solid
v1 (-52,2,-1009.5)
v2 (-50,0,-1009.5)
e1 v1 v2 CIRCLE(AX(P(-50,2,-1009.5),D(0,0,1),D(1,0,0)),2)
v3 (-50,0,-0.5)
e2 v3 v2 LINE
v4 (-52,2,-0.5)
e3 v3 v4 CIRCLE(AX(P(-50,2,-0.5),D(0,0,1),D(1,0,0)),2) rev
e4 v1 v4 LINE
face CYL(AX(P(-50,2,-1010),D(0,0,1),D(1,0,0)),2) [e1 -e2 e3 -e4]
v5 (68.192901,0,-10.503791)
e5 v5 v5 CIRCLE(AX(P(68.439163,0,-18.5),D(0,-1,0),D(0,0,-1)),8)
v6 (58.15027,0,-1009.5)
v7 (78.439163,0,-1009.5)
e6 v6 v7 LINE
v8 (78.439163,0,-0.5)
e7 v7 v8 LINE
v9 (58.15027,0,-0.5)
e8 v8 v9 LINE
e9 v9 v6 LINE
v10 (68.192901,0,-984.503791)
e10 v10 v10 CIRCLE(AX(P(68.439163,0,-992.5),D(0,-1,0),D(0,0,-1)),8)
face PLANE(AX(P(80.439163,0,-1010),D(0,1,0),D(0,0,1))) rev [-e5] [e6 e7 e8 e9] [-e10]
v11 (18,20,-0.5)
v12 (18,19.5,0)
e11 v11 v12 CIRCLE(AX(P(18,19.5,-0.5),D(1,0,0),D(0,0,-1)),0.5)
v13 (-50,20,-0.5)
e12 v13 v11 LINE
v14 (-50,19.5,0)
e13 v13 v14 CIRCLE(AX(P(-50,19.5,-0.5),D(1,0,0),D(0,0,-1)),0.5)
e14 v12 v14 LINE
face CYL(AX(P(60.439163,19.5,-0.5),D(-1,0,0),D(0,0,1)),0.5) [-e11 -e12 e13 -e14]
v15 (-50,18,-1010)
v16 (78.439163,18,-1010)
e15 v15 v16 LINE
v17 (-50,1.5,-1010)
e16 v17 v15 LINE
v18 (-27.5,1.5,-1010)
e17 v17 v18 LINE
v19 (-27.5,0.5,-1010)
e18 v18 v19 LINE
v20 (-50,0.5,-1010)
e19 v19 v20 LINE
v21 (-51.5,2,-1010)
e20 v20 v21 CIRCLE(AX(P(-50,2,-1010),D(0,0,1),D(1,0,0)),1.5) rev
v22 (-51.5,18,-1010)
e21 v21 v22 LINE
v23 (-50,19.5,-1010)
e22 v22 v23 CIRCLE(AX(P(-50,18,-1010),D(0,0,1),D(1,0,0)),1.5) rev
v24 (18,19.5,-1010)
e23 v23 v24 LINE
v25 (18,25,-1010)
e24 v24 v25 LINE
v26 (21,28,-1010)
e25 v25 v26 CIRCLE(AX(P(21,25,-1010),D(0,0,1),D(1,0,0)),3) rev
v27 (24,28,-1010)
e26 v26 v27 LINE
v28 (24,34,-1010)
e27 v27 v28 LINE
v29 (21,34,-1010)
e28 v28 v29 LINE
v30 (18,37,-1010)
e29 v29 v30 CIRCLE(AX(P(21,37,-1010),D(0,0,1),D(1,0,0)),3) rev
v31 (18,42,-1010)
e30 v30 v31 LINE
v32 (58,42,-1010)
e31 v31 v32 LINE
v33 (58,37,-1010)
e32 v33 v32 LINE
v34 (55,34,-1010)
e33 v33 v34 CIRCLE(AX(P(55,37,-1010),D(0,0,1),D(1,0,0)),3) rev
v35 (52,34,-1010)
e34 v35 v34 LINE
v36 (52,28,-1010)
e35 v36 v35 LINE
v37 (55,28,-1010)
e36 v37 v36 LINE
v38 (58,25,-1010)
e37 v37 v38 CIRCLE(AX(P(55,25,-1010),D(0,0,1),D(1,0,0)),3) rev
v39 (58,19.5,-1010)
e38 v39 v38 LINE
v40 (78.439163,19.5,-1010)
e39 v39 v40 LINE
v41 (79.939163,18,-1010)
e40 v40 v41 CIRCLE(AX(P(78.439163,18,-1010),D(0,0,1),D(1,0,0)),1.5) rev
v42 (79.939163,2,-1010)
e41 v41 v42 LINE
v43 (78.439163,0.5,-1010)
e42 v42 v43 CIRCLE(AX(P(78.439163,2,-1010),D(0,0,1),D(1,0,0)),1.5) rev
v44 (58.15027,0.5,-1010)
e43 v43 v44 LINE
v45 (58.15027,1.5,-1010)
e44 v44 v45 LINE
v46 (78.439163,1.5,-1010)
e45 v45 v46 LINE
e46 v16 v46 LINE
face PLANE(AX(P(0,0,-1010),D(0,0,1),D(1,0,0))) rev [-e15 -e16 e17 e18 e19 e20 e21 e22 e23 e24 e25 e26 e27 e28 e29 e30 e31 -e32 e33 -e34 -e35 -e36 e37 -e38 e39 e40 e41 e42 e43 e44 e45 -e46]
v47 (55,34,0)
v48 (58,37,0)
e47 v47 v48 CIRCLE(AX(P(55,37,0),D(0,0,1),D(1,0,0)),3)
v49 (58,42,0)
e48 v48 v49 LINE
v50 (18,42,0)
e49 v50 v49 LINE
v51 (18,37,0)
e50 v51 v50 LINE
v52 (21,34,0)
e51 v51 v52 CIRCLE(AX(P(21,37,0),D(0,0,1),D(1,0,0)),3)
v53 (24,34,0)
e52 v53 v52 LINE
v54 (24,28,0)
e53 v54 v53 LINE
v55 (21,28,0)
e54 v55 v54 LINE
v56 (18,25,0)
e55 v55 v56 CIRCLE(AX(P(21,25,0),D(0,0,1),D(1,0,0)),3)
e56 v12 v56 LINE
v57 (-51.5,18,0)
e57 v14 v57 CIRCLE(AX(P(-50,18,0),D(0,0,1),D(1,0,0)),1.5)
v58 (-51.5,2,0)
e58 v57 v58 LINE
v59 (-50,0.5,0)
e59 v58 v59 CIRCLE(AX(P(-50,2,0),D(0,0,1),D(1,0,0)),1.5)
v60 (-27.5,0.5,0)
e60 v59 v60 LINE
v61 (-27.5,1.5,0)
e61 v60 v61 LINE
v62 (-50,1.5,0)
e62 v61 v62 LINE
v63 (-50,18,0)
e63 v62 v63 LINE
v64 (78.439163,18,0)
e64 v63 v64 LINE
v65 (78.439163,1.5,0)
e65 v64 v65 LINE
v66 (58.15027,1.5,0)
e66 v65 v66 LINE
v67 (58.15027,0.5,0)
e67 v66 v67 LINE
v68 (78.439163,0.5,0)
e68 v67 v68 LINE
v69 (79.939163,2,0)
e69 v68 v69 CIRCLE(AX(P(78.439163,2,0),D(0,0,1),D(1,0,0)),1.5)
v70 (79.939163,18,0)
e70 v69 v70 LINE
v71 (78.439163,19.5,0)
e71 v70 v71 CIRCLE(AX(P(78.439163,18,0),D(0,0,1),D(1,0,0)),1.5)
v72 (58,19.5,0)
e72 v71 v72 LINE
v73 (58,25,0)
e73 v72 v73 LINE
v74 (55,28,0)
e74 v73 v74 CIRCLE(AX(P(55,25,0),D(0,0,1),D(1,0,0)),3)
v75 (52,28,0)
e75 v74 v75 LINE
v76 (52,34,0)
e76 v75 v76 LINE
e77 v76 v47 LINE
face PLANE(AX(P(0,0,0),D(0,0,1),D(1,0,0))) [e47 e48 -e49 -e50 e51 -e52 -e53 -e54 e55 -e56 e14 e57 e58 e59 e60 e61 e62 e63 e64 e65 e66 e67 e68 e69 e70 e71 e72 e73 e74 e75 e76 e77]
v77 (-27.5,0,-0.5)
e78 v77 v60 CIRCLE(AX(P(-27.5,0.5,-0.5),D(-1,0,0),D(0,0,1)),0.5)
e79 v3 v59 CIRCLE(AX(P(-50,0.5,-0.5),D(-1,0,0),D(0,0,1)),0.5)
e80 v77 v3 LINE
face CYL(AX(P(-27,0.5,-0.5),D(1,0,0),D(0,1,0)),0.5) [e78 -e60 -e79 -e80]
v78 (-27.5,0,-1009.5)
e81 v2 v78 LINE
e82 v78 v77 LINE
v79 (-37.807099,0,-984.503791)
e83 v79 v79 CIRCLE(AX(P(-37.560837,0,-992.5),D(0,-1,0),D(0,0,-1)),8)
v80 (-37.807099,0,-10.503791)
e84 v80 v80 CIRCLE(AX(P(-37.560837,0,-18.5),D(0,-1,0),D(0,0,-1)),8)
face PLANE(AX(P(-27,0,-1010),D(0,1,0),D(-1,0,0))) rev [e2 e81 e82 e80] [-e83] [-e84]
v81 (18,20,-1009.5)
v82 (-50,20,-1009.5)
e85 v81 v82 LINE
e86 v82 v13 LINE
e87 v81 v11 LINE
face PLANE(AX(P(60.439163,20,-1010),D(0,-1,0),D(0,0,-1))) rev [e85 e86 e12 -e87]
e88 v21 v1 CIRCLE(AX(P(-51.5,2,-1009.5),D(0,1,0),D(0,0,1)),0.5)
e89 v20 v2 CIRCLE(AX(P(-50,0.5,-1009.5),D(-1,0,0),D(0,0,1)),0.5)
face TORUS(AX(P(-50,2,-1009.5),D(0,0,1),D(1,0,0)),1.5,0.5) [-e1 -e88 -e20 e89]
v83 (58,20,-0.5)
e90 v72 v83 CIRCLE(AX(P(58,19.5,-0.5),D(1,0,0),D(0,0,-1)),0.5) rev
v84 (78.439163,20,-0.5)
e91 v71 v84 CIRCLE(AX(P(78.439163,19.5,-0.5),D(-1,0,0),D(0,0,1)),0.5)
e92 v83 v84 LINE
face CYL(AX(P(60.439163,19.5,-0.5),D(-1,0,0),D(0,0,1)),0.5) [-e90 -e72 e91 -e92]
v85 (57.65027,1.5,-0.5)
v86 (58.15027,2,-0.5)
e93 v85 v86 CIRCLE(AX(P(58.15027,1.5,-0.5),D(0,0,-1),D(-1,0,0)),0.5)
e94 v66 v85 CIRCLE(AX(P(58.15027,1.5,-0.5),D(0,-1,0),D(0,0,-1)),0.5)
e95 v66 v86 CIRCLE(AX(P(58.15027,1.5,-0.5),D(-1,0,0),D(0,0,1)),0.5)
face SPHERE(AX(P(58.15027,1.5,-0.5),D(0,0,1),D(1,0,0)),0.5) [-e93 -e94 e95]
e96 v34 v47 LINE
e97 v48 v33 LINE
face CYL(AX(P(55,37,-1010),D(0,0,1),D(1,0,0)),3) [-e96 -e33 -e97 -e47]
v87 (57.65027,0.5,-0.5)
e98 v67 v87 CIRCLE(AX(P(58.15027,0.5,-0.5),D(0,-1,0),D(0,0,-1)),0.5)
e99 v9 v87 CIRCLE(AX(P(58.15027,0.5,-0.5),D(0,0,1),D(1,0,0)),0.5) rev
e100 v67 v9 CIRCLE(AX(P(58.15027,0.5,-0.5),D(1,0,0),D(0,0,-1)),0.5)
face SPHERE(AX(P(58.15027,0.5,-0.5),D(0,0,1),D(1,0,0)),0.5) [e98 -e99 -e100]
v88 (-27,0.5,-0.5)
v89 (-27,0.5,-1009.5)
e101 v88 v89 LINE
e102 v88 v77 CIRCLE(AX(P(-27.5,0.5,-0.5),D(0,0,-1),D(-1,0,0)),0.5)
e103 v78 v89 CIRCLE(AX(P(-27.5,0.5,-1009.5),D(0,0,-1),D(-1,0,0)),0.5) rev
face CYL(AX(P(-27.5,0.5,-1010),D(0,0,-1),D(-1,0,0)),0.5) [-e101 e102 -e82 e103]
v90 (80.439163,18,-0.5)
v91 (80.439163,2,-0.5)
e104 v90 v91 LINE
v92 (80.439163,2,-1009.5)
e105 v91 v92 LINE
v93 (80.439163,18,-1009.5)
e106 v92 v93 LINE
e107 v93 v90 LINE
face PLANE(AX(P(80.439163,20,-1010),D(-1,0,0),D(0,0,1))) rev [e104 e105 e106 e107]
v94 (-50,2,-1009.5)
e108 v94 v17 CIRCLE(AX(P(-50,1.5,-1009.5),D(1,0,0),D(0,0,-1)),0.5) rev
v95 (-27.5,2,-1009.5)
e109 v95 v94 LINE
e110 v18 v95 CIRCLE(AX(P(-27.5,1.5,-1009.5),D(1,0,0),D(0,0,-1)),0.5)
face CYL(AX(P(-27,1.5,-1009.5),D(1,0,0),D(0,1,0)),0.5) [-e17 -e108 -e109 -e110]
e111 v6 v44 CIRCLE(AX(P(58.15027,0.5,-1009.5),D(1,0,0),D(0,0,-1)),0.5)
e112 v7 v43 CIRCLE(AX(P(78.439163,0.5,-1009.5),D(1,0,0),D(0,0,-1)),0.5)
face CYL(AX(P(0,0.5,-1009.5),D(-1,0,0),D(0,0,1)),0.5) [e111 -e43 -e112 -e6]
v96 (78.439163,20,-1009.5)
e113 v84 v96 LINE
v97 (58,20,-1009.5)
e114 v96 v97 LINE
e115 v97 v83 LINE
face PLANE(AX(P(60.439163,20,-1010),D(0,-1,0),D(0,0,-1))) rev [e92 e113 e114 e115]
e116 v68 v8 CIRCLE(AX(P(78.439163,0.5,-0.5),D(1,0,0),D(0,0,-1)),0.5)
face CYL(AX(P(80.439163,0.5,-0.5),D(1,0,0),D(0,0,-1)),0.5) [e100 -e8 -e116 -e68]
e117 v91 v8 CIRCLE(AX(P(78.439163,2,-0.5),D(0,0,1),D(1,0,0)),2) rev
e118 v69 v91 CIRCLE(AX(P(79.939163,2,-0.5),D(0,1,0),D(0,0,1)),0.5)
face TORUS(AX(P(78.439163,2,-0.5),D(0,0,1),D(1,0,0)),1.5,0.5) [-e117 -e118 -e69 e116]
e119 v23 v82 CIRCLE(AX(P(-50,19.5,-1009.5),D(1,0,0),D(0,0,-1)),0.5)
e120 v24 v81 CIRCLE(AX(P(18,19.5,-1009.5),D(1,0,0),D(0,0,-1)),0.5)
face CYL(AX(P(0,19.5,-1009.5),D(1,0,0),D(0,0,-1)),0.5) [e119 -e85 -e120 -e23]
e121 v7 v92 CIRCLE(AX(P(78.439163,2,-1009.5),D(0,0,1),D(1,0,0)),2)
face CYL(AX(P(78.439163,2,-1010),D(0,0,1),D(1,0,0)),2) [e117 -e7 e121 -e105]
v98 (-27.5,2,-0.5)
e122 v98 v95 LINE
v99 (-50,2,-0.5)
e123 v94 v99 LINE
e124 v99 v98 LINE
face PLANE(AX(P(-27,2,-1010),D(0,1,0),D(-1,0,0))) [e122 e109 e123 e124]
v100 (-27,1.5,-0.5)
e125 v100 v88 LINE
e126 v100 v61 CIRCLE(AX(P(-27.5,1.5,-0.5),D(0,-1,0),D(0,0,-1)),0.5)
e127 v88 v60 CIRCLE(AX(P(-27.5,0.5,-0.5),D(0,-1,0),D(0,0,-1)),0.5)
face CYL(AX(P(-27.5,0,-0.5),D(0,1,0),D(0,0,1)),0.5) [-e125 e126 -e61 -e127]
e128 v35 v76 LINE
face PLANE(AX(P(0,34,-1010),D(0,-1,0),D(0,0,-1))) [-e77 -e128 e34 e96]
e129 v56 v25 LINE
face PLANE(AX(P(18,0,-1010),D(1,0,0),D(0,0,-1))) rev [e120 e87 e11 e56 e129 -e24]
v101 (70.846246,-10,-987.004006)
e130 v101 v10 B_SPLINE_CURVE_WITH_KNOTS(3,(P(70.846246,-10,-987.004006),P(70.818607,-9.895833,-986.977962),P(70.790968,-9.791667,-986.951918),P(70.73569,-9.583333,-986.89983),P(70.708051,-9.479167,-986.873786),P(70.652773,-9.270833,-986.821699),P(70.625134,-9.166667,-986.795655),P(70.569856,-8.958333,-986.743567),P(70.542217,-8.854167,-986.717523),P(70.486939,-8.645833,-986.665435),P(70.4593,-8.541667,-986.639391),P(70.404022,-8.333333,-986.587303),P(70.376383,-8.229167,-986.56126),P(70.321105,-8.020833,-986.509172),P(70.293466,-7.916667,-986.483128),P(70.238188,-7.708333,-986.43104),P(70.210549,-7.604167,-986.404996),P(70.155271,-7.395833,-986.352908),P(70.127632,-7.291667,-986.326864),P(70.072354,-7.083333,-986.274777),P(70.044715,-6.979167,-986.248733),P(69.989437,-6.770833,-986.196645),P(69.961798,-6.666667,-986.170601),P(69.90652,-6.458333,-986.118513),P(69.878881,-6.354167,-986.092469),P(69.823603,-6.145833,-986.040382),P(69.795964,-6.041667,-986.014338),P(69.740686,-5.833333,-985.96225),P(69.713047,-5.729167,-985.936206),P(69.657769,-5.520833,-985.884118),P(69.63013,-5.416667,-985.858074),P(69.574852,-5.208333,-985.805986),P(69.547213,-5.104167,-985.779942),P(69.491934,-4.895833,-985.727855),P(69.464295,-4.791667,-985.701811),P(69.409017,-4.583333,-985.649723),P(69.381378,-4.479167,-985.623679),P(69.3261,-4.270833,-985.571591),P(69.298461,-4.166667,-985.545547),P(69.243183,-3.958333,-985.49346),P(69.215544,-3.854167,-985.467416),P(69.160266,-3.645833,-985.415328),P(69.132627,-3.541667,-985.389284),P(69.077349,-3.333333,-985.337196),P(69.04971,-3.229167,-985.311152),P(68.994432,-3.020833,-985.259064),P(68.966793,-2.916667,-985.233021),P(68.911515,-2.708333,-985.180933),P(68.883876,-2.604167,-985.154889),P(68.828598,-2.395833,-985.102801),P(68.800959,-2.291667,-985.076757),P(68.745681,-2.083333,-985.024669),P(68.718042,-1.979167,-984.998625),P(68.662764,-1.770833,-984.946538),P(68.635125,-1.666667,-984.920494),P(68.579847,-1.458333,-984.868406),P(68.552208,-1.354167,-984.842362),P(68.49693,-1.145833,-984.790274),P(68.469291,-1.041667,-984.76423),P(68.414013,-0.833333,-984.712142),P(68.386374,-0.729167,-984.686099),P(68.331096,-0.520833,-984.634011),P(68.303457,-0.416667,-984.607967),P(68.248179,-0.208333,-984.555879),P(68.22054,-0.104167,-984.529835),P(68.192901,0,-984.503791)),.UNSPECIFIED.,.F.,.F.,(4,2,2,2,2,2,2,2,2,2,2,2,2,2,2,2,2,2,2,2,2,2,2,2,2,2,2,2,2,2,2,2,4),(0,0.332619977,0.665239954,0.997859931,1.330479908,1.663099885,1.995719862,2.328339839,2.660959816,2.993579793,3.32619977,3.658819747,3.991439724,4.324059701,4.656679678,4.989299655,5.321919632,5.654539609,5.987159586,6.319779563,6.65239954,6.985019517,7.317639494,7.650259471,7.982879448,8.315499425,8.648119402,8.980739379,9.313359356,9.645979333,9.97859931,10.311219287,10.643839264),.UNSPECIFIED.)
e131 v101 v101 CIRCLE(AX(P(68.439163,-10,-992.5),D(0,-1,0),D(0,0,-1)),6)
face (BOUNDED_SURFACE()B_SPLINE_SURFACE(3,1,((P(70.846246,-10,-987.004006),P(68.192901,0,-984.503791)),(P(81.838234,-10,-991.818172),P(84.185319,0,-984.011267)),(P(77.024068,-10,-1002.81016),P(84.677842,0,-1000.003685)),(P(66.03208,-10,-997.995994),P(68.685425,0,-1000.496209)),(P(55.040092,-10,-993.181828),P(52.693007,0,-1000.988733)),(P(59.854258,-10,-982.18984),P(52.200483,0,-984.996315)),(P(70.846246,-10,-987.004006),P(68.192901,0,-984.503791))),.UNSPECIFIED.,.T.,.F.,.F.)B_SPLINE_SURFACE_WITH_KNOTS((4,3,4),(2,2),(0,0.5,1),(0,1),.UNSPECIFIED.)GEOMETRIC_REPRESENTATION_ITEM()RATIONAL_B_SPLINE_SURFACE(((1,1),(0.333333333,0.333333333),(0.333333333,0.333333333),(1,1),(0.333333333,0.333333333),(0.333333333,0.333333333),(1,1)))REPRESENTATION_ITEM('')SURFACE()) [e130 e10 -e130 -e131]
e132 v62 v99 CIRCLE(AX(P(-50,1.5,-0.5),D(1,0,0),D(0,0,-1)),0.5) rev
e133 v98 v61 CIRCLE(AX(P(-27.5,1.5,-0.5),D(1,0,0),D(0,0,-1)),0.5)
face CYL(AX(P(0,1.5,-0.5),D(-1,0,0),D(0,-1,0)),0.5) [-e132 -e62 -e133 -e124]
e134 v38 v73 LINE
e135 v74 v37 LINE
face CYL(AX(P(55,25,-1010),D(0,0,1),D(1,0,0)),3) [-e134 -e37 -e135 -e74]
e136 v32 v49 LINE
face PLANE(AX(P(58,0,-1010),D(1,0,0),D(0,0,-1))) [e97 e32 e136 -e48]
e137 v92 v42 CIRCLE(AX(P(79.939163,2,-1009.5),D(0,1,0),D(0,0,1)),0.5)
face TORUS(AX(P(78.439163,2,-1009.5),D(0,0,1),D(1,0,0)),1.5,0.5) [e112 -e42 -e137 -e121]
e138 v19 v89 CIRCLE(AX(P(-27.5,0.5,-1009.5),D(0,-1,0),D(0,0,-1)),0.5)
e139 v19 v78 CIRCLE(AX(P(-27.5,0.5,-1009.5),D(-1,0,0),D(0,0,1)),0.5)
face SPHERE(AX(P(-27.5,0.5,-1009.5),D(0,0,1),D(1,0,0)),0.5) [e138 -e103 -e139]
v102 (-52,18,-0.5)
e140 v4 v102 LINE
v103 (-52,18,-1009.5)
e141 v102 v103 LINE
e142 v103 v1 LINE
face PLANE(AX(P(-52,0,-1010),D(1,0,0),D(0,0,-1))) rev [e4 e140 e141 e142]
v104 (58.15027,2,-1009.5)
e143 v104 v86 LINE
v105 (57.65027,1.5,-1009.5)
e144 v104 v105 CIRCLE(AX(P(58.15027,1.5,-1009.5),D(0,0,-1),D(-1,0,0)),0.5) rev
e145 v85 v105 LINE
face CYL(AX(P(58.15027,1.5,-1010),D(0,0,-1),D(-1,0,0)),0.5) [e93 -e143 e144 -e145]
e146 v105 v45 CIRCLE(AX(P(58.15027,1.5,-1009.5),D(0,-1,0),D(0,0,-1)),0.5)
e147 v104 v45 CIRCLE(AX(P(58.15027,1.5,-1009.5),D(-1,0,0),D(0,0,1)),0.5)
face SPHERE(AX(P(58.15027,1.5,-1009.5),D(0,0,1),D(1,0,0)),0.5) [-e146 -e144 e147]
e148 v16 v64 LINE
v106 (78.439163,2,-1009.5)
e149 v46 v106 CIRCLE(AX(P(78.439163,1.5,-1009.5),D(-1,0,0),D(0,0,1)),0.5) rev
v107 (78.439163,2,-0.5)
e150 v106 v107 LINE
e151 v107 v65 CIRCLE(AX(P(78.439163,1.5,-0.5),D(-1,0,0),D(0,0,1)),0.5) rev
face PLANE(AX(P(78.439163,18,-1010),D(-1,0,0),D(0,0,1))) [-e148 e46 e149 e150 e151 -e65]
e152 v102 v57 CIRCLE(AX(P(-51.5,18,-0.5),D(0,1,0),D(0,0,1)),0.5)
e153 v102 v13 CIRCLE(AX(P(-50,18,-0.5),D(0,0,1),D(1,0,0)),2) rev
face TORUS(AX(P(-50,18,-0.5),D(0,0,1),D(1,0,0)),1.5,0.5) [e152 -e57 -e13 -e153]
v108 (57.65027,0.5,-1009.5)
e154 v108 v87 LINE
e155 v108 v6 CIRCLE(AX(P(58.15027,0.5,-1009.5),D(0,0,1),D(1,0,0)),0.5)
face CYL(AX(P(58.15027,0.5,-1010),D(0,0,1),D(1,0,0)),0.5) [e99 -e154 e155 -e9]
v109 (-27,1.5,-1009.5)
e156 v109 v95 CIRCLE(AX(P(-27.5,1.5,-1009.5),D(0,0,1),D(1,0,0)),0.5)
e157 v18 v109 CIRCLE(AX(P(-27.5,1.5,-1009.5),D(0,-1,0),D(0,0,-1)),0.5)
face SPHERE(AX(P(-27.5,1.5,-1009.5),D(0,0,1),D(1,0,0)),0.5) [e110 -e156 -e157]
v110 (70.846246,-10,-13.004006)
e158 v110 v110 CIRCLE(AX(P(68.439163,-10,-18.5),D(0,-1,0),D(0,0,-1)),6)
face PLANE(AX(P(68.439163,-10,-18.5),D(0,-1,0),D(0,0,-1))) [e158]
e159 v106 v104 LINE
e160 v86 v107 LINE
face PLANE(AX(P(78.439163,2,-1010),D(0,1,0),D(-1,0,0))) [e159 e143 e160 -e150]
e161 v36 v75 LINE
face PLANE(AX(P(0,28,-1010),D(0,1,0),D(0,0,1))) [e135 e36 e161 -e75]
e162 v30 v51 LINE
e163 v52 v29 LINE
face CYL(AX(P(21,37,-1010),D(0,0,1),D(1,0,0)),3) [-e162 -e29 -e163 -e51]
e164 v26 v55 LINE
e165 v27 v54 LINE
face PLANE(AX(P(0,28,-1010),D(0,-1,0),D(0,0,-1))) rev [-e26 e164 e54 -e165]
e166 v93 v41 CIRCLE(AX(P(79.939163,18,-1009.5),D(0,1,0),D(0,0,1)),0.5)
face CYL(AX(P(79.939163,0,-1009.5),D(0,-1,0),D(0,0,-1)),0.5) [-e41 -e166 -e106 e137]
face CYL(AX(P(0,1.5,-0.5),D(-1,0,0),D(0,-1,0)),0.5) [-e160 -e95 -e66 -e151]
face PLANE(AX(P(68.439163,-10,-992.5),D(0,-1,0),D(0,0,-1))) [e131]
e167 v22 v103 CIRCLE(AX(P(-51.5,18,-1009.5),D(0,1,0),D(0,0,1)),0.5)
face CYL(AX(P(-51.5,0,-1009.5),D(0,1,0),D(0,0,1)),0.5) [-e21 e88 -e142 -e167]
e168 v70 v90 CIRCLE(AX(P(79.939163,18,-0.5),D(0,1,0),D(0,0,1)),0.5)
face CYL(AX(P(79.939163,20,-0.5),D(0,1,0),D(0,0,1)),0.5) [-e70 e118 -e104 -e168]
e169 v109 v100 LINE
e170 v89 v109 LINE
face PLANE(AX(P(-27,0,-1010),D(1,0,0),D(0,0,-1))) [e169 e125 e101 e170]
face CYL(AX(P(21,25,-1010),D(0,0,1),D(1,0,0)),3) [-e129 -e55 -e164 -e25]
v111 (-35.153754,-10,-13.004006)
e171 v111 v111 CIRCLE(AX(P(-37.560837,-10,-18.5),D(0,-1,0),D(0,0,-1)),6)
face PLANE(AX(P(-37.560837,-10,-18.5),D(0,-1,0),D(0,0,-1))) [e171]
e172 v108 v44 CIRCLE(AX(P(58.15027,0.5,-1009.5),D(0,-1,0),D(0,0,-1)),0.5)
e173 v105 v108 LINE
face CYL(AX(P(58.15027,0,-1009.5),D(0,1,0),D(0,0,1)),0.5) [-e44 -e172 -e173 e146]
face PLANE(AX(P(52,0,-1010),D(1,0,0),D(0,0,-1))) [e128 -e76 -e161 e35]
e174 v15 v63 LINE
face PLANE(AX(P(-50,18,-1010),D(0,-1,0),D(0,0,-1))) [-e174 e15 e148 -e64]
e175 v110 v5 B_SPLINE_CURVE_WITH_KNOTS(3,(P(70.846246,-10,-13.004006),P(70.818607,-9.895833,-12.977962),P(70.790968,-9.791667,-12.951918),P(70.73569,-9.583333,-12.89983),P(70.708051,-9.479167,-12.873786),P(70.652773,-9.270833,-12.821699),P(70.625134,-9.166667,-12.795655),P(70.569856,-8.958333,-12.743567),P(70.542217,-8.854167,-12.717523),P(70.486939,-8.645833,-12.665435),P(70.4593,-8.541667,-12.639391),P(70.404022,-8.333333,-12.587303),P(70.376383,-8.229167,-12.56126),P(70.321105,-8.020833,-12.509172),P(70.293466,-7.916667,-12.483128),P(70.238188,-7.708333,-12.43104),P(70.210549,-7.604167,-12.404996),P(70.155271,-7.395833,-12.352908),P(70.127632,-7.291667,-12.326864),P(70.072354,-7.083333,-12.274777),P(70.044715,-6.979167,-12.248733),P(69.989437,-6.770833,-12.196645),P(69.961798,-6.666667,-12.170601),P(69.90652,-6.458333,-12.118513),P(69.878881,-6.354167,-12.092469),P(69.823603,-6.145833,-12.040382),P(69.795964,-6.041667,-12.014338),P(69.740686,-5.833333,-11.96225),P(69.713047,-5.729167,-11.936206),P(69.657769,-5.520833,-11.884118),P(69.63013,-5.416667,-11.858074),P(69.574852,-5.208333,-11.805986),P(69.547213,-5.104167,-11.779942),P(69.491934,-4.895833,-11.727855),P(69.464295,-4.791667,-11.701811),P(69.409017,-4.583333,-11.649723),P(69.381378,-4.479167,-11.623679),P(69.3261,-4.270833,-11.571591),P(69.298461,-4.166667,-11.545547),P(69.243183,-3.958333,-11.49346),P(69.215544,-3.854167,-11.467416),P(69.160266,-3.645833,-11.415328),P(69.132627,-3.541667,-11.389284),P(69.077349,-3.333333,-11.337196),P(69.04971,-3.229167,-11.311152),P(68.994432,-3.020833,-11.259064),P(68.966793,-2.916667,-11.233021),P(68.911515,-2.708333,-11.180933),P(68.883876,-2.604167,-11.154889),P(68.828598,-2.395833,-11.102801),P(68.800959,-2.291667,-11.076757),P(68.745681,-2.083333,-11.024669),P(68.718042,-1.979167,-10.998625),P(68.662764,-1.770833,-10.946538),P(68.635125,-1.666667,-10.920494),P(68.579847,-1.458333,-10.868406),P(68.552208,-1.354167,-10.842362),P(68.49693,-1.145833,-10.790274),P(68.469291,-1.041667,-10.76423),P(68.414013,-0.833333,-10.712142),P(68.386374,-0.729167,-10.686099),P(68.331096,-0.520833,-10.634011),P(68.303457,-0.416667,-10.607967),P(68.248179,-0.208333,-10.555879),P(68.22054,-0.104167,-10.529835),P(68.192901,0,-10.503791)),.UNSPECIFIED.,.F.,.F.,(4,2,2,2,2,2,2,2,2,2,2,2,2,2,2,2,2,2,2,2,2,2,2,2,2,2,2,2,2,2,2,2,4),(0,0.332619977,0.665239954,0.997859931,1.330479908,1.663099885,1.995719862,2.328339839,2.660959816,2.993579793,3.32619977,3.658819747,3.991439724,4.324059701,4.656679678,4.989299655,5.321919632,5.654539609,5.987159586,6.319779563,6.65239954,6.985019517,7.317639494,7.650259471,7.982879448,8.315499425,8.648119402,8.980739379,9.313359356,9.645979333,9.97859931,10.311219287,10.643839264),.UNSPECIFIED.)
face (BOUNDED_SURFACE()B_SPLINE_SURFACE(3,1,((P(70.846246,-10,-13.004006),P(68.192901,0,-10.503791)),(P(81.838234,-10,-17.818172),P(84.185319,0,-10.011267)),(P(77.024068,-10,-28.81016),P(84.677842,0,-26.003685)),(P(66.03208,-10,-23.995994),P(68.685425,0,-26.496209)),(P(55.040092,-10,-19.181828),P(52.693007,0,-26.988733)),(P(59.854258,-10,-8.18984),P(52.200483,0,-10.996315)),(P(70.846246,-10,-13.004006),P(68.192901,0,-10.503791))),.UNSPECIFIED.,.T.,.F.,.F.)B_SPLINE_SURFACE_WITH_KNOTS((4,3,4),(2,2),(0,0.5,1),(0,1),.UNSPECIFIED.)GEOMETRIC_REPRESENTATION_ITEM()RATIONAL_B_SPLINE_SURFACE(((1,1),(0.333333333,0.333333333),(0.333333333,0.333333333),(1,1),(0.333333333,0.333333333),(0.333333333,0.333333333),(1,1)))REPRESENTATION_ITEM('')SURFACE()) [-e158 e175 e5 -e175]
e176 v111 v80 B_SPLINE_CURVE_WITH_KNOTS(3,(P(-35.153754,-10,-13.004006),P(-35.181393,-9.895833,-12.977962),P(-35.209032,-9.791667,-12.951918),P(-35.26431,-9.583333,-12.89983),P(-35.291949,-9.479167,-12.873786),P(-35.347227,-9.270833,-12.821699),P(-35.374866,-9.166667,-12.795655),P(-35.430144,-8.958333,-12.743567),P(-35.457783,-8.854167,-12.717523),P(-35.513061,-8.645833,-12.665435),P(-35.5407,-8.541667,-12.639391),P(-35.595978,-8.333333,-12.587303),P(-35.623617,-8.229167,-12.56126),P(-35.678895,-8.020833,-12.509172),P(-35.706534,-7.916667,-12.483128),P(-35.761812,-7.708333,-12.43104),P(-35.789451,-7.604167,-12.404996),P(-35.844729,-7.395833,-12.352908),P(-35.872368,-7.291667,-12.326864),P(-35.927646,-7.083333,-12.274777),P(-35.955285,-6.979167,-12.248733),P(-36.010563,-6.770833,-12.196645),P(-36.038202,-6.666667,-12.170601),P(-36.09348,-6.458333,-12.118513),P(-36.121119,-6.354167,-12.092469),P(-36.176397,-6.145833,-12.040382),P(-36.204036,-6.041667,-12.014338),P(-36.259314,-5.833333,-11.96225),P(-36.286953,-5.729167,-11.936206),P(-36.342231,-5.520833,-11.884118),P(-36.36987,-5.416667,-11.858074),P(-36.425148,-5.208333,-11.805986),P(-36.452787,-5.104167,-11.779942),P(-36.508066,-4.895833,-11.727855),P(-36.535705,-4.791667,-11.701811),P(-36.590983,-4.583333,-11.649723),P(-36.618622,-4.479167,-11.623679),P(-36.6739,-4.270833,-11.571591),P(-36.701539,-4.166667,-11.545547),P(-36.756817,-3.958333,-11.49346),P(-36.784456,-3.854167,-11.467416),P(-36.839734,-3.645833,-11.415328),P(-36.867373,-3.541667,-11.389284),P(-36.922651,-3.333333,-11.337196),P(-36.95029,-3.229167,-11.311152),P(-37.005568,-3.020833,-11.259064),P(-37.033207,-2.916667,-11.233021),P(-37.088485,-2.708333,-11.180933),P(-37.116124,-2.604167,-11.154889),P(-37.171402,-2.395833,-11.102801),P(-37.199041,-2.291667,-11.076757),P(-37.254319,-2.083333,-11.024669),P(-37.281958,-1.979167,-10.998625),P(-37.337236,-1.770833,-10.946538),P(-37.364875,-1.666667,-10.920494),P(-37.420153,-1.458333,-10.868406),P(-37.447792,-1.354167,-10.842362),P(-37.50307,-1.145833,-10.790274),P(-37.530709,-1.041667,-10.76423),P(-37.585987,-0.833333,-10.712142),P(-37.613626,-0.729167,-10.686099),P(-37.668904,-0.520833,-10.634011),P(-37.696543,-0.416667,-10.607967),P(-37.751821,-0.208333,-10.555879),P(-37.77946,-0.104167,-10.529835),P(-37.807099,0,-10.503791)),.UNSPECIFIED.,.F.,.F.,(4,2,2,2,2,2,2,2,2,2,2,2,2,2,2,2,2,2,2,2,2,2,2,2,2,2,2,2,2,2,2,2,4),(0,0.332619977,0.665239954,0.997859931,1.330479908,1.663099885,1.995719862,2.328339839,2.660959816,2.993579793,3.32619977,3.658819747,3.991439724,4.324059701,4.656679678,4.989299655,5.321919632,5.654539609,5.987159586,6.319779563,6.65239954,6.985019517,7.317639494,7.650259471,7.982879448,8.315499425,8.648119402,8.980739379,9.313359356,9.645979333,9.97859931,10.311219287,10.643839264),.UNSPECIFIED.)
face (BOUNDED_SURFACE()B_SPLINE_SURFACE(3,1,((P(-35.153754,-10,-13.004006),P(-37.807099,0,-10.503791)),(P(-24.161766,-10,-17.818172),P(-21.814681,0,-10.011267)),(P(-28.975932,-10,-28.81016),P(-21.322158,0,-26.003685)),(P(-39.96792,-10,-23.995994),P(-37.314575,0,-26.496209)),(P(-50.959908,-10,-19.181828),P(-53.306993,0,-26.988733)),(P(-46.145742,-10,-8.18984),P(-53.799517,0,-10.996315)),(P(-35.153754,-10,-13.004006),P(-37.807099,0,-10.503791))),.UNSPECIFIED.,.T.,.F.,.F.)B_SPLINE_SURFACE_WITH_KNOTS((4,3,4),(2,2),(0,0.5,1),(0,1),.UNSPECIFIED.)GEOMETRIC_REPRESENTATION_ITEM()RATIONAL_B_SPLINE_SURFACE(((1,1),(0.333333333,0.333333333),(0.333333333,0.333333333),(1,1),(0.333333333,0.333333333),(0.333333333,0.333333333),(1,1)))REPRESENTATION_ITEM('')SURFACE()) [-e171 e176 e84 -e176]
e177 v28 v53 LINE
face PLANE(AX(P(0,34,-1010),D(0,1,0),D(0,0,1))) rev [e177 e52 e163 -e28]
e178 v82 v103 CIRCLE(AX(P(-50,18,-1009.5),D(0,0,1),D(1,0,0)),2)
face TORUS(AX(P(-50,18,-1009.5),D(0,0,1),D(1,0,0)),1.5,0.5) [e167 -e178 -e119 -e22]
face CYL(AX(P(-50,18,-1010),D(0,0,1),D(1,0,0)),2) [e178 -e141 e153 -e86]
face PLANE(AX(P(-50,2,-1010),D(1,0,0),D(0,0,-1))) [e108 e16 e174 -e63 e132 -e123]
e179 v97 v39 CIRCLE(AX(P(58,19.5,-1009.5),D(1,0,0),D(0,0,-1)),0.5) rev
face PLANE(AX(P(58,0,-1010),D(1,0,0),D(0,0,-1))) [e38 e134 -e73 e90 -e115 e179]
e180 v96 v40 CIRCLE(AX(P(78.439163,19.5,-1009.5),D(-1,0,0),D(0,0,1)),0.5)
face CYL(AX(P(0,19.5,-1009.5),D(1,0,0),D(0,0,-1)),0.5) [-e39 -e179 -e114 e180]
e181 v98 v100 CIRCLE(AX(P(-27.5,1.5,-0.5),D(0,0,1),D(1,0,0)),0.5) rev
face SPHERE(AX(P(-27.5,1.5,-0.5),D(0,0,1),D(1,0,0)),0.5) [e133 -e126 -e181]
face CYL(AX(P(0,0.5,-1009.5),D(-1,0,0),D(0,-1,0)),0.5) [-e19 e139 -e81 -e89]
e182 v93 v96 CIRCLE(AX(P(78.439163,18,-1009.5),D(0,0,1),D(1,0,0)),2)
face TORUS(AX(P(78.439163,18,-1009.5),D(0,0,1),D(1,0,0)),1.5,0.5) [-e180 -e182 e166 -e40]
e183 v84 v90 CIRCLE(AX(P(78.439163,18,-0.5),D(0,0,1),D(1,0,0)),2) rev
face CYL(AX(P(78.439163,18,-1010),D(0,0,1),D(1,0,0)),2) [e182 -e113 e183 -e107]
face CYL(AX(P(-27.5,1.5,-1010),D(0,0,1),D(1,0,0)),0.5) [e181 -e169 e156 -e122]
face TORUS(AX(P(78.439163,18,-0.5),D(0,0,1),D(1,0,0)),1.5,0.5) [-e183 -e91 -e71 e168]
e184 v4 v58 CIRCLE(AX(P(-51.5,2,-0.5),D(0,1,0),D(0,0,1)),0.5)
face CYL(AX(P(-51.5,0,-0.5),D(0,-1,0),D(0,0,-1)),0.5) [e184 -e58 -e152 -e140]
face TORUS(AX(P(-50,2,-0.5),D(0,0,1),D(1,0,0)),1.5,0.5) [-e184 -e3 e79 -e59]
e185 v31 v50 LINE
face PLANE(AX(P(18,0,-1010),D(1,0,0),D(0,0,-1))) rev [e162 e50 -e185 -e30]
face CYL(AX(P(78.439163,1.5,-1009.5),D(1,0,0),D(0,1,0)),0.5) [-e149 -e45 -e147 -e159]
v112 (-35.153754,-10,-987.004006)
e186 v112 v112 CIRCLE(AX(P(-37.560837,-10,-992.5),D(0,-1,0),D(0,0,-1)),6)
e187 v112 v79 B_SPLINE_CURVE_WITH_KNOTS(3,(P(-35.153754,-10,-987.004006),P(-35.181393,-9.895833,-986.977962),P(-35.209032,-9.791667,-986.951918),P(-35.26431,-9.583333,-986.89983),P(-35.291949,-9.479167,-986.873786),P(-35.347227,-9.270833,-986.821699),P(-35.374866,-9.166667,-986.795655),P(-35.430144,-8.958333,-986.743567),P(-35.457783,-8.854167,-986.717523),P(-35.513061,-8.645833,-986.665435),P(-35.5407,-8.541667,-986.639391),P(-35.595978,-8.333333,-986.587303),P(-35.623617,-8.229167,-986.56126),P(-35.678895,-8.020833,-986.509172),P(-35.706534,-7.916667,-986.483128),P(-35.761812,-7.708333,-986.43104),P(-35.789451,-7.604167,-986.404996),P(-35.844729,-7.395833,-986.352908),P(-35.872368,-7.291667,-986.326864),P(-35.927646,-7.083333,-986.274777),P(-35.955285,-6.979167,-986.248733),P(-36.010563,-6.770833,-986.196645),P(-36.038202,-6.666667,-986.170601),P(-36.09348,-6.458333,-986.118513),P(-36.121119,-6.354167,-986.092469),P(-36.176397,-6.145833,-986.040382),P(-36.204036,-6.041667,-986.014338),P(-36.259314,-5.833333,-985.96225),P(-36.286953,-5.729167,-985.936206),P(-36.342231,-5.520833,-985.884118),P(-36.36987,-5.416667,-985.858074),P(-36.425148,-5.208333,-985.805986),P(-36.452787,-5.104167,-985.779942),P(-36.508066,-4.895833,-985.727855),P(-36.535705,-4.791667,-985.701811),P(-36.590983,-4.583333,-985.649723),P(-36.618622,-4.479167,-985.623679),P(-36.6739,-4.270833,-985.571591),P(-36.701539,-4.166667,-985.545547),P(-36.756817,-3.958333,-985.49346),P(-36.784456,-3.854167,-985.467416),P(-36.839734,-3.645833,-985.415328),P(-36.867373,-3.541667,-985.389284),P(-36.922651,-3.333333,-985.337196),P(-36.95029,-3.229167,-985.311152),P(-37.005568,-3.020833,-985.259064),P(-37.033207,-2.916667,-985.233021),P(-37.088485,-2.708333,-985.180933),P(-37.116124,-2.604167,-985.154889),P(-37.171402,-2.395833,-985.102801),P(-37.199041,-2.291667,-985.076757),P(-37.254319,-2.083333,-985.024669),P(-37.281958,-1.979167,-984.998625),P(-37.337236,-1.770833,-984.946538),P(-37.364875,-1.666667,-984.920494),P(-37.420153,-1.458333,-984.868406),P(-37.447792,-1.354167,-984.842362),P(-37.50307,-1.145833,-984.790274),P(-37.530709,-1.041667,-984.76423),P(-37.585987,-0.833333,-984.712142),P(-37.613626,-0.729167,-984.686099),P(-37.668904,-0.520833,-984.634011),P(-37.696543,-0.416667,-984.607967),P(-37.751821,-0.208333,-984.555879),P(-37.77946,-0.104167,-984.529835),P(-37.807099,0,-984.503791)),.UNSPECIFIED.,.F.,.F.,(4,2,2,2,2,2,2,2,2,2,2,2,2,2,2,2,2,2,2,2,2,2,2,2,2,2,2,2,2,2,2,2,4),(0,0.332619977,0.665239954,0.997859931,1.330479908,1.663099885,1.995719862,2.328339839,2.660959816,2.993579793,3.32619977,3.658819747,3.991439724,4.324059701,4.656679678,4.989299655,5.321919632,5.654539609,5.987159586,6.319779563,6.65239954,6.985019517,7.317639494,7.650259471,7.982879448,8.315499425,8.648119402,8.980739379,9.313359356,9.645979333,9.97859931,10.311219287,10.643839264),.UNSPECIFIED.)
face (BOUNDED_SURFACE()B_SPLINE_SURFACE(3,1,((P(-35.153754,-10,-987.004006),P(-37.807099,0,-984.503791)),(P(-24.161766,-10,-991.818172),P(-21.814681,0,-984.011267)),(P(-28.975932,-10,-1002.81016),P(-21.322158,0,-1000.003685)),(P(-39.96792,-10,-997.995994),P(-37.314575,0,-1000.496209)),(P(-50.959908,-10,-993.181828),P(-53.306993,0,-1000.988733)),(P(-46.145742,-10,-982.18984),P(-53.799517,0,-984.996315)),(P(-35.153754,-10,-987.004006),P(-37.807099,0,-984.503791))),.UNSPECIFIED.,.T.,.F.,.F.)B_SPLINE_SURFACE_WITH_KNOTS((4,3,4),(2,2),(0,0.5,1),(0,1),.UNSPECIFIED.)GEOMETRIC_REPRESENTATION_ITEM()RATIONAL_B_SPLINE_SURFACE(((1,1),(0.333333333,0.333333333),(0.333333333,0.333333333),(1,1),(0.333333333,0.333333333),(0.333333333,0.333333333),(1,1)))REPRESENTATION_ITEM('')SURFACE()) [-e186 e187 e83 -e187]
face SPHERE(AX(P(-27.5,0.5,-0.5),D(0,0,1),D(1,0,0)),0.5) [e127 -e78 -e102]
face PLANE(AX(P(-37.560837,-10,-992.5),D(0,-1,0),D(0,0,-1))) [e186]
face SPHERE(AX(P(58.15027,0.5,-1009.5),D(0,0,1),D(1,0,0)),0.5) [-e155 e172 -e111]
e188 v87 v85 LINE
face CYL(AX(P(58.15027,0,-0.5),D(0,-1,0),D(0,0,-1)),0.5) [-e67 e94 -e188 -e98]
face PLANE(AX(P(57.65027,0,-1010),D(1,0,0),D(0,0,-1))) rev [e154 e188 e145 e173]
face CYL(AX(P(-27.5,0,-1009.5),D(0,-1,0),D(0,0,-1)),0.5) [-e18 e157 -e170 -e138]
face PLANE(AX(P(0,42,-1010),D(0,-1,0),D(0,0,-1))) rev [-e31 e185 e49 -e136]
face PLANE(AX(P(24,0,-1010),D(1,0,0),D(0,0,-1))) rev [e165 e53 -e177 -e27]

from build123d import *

# Parameters (mm, degrees)
EXTRUDE_1_DEPTH = 1010
FILLET_1_R      = 2
FILLET_2_R      = 0.5
FILLET_3_R      = 0.5
FILLET_4_R      = 3


with BuildPart() as part:
    # 草图1 → 凸台-拉伸1 (new body)
    with BuildSketch(Plane.XY):
        Polygon((-52, 0), (-27, 0), (-27, 2), (-50, 2), (-50, 18), (78.43916289, 18), (78.43916289, 2), (57.650269721, 2), (57.650269721, 0), (80.43916289, 0), (80.43916289, 20), (58, 20), (58, 28), (52, 28), (52, 34), (58, 34), (58, 42), (18, 42), (18, 34), (24, 34), (24, 28), (18, 28), (18, 20), (-52, 20), align=None)
    extrude(amount=-EXTRUDE_1_DEPTH)

    # 圆角1
    fillet_1_edges = [part.edges().sort_by_distance(p)[0] for p in [
        (80.43916289, 20, -505),
        (80.43916289, 0, -505),
        (-52, 0, -505),
        (-52, 20, -505),
    ]]
    fillet(fillet_1_edges, radius=FILLET_1_R)

    # 圆角2
    fillet_2_edges = [part.edges().sort_by_distance(p)[0] for p in [
        (57.650269721, 0, -505),
        (57.650269721, 2, -505),
        (-27, 2, -505),
        (-27, 0, -505),
    ]]
    fillet(fillet_2_edges, radius=FILLET_2_R)

    # 圆角3
    fillet_3_edges = [part.edges().sort_by_distance(p)[0] for p in [
        (57.650269721, 1, 0),
        (57.650269721, 1, -1010),
        (-38.75, 0, 0),
        (-27, 1, 0),
        (-38.75, 2, 0),
        (-27.146446609, 1.853553391, 0),
        (-27.146446609, 0.146446609, 0),
        (57.79671633, 1.853553391, 0),
        (57.79671633, 0.146446609, 0),
        (-38.75, 2, -1010),
        (-27, 1, -1010),
        (-38.75, 0, -1010),
        (-27.146446609, 1.853553391, -1010),
        (-27.146446609, 0.146446609, -1010),
        (57.79671633, 1.853553391, -1010),
        (57.79671633, 0.146446609, -1010),
        (68.294716305, 2, -1010),
        (68.219581445, 20, -1010),
        (68.294716305, 2, 0),
        (68.219581445, 20, 0),
        (68.294716305, 0, 0),
        (68.294716305, 0, -1010),
        (-16, 20, 0),
        (-52, 10, 0),
        (80.43916289, 10, 0),
        (-51.414213562, 19.414213562, 0),
        (-51.414213562, 0.585786438, 0),
        (79.853376452, 19.414213562, 0),
        (79.853376452, 0.585786438, 0),
        (80.43916289, 10, -1010),
        (-52, 10, -1010),
        (-16, 20, -1010),
        (-51.414213562, 19.414213562, -1010),
        (-51.414213562, 0.585786438, -1010),
        (79.853376452, 19.414213562, -1010),
        (79.853376452, 0.585786438, -1010),
    ]]
    fillet(fillet_3_edges, radius=FILLET_3_R)

    # 圆角4
    fillet_4_edges = [part.edges().sort_by_distance(p)[0] for p in [
        (58, 34, -505),
        (58, 28, -505),
        (18, 28, -505),
        (18, 34, -505),
    ]]
    fillet(fillet_4_edges, radius=FILLET_4_R)

    # 放样1: read off the stored shape, not the designer's step
    # 放样1: loft between two sections, ruled curve by curve
    loft_1_from = [
        Edge.make_bspline([(70.846246082, -10, -13.004005958), (81.838234165, -10, -17.818172342), (77.024067781, -10, -28.810160426), (66.032079698, -10, -23.995994042), (55.040091614, -10, -19.181827658), (59.854257998, -10, -8.189839574), (70.846246082, -10, -13.004005958)], [0, 0, 0, 0, 0.5, 0.5, 0.5, 1, 1, 1, 1], 3, [1, 0.333333333, 0.333333333, 1, 0.333333333, 0.333333333, 1]),
    ]
    loft_1_to = [
        Edge.make_bspline([(68.192900935, 0, -10.503791208), (84.185318519, 0, -10.011267297), (84.67784243, 0, -26.003684881), (68.685424845, 0, -26.496208792), (52.693007261, 0, -26.988732703), (52.20048335, 0, -10.996315119), (68.192900935, 0, -10.503791208)], [0, 0, 0, 0, 0.5, 0.5, 0.5, 1, 1, 1, 1], 3, [1, 0.333333333, 0.333333333, 1, 0.333333333, 0.333333333, 1]),
    ]
    loft_1 = Solid(Shell([*[Face.make_surface_from_curves(loft_1_from[k], loft_1_to[k]) for k in range(1)], Face(Wire(loft_1_from)), Face(Wire(loft_1_to))]))
    add(loft_1)

    # 阵列(线性)1: read off the stored shape, not the designer's step
    # 阵列(线性)1: loft between two sections, ruled curve by curve
    pattern_linear_1_from = [
        Edge.make_bspline([(70.846246082, -10, -987.004005958), (81.838234165, -10, -991.818172342), (77.024067781, -10, -1002.810160426), (66.032079698, -10, -997.995994042), (55.040091614, -10, -993.181827658), (59.854257998, -10, -982.189839574), (70.846246082, -10, -987.004005958)], [0, 0, 0, 0, 0.5, 0.5, 0.5, 1, 1, 1, 1], 3, [1, 0.333333333, 0.333333333, 1, 0.333333333, 0.333333333, 1]),
    ]
    pattern_linear_1_to = [
        Edge.make_bspline([(68.192900935, 0, -984.503791208), (84.185318519, 0, -984.011267297), (84.67784243, 0, -1000.003684881), (68.685424845, 0, -1000.496208792), (52.693007261, 0, -1000.988732703), (52.20048335, 0, -984.996315119), (68.192900935, 0, -984.503791208)], [0, 0, 0, 0, 0.5, 0.5, 0.5, 1, 1, 1, 1], 3, [1, 0.333333333, 0.333333333, 1, 0.333333333, 0.333333333, 1]),
    ]
    pattern_linear_1 = Solid(Shell([*[Face.make_surface_from_curves(pattern_linear_1_from[k], pattern_linear_1_to[k]) for k in range(1)], Face(Wire(pattern_linear_1_from)), Face(Wire(pattern_linear_1_to))]))
    add(pattern_linear_1)

    # Pattern Linear 1 2: loft between two sections, ruled curve by curve
    pattern_linear_1_2_from = [
        Edge.make_bspline([(-35.153753918, -10, -13.004005958), (-24.161765835, -10, -17.818172342), (-28.975932219, -10, -28.810160426), (-39.967920302, -10, -23.995994042), (-50.959908386, -10, -19.181827658), (-46.145742002, -10, -8.189839574), (-35.153753918, -10, -13.004005958)], [0, 0, 0, 0, 0.5, 0.5, 0.5, 1, 1, 1, 1], 3, [1, 0.333333333, 0.333333333, 1, 0.333333333, 0.333333333, 1]),
    ]
    pattern_linear_1_2_to = [
        Edge.make_bspline([(-37.807099065, 0, -10.503791208), (-21.814681481, 0, -10.011267297), (-21.32215757, 0, -26.003684881), (-37.314575155, 0, -26.496208792), (-53.306992739, 0, -26.988732703), (-53.79951665, 0, -10.996315119), (-37.807099065, 0, -10.503791208)], [0, 0, 0, 0, 0.5, 0.5, 0.5, 1, 1, 1, 1], 3, [1, 0.333333333, 0.333333333, 1, 0.333333333, 0.333333333, 1]),
    ]
    pattern_linear_1_2 = Solid(Shell([*[Face.make_surface_from_curves(pattern_linear_1_2_from[k], pattern_linear_1_2_to[k]) for k in range(1)], Face(Wire(pattern_linear_1_2_from)), Face(Wire(pattern_linear_1_2_to))]))
    add(pattern_linear_1_2)

    # Pattern Linear 1 3: loft between two sections, ruled curve by curve
    pattern_linear_1_3_from = [
        Edge.make_bspline([(-35.153753918, -10, -987.004005958), (-24.161765835, -10, -991.818172342), (-28.975932219, -10, -1002.810160426), (-39.967920302, -10, -997.995994042), (-50.959908386, -10, -993.181827658), (-46.145742002, -10, -982.189839574), (-35.153753918, -10, -987.004005958)], [0, 0, 0, 0, 0.5, 0.5, 0.5, 1, 1, 1, 1], 3, [1, 0.333333333, 0.333333333, 1, 0.333333333, 0.333333333, 1]),
    ]
    pattern_linear_1_3_to = [
        Edge.make_bspline([(-37.807099065, 0, -984.503791208), (-21.814681481, 0, -984.011267297), (-21.32215757, 0, -1000.003684881), (-37.314575155, 0, -1000.496208792), (-53.306992739, 0, -1000.988732703), (-53.79951665, 0, -984.996315119), (-37.807099065, 0, -984.503791208)], [0, 0, 0, 0, 0.5, 0.5, 0.5, 1, 1, 1, 1], 3, [1, 0.333333333, 0.333333333, 1, 0.333333333, 0.333333333, 1]),
    ]
    pattern_linear_1_3 = Solid(Shell([*[Face.make_surface_from_curves(pattern_linear_1_3_from[k], pattern_linear_1_3_to[k]) for k in range(1)], Face(Wire(pattern_linear_1_3_from)), Face(Wire(pattern_linear_1_3_to))]))
    add(pattern_linear_1_3)


solid = part.part
